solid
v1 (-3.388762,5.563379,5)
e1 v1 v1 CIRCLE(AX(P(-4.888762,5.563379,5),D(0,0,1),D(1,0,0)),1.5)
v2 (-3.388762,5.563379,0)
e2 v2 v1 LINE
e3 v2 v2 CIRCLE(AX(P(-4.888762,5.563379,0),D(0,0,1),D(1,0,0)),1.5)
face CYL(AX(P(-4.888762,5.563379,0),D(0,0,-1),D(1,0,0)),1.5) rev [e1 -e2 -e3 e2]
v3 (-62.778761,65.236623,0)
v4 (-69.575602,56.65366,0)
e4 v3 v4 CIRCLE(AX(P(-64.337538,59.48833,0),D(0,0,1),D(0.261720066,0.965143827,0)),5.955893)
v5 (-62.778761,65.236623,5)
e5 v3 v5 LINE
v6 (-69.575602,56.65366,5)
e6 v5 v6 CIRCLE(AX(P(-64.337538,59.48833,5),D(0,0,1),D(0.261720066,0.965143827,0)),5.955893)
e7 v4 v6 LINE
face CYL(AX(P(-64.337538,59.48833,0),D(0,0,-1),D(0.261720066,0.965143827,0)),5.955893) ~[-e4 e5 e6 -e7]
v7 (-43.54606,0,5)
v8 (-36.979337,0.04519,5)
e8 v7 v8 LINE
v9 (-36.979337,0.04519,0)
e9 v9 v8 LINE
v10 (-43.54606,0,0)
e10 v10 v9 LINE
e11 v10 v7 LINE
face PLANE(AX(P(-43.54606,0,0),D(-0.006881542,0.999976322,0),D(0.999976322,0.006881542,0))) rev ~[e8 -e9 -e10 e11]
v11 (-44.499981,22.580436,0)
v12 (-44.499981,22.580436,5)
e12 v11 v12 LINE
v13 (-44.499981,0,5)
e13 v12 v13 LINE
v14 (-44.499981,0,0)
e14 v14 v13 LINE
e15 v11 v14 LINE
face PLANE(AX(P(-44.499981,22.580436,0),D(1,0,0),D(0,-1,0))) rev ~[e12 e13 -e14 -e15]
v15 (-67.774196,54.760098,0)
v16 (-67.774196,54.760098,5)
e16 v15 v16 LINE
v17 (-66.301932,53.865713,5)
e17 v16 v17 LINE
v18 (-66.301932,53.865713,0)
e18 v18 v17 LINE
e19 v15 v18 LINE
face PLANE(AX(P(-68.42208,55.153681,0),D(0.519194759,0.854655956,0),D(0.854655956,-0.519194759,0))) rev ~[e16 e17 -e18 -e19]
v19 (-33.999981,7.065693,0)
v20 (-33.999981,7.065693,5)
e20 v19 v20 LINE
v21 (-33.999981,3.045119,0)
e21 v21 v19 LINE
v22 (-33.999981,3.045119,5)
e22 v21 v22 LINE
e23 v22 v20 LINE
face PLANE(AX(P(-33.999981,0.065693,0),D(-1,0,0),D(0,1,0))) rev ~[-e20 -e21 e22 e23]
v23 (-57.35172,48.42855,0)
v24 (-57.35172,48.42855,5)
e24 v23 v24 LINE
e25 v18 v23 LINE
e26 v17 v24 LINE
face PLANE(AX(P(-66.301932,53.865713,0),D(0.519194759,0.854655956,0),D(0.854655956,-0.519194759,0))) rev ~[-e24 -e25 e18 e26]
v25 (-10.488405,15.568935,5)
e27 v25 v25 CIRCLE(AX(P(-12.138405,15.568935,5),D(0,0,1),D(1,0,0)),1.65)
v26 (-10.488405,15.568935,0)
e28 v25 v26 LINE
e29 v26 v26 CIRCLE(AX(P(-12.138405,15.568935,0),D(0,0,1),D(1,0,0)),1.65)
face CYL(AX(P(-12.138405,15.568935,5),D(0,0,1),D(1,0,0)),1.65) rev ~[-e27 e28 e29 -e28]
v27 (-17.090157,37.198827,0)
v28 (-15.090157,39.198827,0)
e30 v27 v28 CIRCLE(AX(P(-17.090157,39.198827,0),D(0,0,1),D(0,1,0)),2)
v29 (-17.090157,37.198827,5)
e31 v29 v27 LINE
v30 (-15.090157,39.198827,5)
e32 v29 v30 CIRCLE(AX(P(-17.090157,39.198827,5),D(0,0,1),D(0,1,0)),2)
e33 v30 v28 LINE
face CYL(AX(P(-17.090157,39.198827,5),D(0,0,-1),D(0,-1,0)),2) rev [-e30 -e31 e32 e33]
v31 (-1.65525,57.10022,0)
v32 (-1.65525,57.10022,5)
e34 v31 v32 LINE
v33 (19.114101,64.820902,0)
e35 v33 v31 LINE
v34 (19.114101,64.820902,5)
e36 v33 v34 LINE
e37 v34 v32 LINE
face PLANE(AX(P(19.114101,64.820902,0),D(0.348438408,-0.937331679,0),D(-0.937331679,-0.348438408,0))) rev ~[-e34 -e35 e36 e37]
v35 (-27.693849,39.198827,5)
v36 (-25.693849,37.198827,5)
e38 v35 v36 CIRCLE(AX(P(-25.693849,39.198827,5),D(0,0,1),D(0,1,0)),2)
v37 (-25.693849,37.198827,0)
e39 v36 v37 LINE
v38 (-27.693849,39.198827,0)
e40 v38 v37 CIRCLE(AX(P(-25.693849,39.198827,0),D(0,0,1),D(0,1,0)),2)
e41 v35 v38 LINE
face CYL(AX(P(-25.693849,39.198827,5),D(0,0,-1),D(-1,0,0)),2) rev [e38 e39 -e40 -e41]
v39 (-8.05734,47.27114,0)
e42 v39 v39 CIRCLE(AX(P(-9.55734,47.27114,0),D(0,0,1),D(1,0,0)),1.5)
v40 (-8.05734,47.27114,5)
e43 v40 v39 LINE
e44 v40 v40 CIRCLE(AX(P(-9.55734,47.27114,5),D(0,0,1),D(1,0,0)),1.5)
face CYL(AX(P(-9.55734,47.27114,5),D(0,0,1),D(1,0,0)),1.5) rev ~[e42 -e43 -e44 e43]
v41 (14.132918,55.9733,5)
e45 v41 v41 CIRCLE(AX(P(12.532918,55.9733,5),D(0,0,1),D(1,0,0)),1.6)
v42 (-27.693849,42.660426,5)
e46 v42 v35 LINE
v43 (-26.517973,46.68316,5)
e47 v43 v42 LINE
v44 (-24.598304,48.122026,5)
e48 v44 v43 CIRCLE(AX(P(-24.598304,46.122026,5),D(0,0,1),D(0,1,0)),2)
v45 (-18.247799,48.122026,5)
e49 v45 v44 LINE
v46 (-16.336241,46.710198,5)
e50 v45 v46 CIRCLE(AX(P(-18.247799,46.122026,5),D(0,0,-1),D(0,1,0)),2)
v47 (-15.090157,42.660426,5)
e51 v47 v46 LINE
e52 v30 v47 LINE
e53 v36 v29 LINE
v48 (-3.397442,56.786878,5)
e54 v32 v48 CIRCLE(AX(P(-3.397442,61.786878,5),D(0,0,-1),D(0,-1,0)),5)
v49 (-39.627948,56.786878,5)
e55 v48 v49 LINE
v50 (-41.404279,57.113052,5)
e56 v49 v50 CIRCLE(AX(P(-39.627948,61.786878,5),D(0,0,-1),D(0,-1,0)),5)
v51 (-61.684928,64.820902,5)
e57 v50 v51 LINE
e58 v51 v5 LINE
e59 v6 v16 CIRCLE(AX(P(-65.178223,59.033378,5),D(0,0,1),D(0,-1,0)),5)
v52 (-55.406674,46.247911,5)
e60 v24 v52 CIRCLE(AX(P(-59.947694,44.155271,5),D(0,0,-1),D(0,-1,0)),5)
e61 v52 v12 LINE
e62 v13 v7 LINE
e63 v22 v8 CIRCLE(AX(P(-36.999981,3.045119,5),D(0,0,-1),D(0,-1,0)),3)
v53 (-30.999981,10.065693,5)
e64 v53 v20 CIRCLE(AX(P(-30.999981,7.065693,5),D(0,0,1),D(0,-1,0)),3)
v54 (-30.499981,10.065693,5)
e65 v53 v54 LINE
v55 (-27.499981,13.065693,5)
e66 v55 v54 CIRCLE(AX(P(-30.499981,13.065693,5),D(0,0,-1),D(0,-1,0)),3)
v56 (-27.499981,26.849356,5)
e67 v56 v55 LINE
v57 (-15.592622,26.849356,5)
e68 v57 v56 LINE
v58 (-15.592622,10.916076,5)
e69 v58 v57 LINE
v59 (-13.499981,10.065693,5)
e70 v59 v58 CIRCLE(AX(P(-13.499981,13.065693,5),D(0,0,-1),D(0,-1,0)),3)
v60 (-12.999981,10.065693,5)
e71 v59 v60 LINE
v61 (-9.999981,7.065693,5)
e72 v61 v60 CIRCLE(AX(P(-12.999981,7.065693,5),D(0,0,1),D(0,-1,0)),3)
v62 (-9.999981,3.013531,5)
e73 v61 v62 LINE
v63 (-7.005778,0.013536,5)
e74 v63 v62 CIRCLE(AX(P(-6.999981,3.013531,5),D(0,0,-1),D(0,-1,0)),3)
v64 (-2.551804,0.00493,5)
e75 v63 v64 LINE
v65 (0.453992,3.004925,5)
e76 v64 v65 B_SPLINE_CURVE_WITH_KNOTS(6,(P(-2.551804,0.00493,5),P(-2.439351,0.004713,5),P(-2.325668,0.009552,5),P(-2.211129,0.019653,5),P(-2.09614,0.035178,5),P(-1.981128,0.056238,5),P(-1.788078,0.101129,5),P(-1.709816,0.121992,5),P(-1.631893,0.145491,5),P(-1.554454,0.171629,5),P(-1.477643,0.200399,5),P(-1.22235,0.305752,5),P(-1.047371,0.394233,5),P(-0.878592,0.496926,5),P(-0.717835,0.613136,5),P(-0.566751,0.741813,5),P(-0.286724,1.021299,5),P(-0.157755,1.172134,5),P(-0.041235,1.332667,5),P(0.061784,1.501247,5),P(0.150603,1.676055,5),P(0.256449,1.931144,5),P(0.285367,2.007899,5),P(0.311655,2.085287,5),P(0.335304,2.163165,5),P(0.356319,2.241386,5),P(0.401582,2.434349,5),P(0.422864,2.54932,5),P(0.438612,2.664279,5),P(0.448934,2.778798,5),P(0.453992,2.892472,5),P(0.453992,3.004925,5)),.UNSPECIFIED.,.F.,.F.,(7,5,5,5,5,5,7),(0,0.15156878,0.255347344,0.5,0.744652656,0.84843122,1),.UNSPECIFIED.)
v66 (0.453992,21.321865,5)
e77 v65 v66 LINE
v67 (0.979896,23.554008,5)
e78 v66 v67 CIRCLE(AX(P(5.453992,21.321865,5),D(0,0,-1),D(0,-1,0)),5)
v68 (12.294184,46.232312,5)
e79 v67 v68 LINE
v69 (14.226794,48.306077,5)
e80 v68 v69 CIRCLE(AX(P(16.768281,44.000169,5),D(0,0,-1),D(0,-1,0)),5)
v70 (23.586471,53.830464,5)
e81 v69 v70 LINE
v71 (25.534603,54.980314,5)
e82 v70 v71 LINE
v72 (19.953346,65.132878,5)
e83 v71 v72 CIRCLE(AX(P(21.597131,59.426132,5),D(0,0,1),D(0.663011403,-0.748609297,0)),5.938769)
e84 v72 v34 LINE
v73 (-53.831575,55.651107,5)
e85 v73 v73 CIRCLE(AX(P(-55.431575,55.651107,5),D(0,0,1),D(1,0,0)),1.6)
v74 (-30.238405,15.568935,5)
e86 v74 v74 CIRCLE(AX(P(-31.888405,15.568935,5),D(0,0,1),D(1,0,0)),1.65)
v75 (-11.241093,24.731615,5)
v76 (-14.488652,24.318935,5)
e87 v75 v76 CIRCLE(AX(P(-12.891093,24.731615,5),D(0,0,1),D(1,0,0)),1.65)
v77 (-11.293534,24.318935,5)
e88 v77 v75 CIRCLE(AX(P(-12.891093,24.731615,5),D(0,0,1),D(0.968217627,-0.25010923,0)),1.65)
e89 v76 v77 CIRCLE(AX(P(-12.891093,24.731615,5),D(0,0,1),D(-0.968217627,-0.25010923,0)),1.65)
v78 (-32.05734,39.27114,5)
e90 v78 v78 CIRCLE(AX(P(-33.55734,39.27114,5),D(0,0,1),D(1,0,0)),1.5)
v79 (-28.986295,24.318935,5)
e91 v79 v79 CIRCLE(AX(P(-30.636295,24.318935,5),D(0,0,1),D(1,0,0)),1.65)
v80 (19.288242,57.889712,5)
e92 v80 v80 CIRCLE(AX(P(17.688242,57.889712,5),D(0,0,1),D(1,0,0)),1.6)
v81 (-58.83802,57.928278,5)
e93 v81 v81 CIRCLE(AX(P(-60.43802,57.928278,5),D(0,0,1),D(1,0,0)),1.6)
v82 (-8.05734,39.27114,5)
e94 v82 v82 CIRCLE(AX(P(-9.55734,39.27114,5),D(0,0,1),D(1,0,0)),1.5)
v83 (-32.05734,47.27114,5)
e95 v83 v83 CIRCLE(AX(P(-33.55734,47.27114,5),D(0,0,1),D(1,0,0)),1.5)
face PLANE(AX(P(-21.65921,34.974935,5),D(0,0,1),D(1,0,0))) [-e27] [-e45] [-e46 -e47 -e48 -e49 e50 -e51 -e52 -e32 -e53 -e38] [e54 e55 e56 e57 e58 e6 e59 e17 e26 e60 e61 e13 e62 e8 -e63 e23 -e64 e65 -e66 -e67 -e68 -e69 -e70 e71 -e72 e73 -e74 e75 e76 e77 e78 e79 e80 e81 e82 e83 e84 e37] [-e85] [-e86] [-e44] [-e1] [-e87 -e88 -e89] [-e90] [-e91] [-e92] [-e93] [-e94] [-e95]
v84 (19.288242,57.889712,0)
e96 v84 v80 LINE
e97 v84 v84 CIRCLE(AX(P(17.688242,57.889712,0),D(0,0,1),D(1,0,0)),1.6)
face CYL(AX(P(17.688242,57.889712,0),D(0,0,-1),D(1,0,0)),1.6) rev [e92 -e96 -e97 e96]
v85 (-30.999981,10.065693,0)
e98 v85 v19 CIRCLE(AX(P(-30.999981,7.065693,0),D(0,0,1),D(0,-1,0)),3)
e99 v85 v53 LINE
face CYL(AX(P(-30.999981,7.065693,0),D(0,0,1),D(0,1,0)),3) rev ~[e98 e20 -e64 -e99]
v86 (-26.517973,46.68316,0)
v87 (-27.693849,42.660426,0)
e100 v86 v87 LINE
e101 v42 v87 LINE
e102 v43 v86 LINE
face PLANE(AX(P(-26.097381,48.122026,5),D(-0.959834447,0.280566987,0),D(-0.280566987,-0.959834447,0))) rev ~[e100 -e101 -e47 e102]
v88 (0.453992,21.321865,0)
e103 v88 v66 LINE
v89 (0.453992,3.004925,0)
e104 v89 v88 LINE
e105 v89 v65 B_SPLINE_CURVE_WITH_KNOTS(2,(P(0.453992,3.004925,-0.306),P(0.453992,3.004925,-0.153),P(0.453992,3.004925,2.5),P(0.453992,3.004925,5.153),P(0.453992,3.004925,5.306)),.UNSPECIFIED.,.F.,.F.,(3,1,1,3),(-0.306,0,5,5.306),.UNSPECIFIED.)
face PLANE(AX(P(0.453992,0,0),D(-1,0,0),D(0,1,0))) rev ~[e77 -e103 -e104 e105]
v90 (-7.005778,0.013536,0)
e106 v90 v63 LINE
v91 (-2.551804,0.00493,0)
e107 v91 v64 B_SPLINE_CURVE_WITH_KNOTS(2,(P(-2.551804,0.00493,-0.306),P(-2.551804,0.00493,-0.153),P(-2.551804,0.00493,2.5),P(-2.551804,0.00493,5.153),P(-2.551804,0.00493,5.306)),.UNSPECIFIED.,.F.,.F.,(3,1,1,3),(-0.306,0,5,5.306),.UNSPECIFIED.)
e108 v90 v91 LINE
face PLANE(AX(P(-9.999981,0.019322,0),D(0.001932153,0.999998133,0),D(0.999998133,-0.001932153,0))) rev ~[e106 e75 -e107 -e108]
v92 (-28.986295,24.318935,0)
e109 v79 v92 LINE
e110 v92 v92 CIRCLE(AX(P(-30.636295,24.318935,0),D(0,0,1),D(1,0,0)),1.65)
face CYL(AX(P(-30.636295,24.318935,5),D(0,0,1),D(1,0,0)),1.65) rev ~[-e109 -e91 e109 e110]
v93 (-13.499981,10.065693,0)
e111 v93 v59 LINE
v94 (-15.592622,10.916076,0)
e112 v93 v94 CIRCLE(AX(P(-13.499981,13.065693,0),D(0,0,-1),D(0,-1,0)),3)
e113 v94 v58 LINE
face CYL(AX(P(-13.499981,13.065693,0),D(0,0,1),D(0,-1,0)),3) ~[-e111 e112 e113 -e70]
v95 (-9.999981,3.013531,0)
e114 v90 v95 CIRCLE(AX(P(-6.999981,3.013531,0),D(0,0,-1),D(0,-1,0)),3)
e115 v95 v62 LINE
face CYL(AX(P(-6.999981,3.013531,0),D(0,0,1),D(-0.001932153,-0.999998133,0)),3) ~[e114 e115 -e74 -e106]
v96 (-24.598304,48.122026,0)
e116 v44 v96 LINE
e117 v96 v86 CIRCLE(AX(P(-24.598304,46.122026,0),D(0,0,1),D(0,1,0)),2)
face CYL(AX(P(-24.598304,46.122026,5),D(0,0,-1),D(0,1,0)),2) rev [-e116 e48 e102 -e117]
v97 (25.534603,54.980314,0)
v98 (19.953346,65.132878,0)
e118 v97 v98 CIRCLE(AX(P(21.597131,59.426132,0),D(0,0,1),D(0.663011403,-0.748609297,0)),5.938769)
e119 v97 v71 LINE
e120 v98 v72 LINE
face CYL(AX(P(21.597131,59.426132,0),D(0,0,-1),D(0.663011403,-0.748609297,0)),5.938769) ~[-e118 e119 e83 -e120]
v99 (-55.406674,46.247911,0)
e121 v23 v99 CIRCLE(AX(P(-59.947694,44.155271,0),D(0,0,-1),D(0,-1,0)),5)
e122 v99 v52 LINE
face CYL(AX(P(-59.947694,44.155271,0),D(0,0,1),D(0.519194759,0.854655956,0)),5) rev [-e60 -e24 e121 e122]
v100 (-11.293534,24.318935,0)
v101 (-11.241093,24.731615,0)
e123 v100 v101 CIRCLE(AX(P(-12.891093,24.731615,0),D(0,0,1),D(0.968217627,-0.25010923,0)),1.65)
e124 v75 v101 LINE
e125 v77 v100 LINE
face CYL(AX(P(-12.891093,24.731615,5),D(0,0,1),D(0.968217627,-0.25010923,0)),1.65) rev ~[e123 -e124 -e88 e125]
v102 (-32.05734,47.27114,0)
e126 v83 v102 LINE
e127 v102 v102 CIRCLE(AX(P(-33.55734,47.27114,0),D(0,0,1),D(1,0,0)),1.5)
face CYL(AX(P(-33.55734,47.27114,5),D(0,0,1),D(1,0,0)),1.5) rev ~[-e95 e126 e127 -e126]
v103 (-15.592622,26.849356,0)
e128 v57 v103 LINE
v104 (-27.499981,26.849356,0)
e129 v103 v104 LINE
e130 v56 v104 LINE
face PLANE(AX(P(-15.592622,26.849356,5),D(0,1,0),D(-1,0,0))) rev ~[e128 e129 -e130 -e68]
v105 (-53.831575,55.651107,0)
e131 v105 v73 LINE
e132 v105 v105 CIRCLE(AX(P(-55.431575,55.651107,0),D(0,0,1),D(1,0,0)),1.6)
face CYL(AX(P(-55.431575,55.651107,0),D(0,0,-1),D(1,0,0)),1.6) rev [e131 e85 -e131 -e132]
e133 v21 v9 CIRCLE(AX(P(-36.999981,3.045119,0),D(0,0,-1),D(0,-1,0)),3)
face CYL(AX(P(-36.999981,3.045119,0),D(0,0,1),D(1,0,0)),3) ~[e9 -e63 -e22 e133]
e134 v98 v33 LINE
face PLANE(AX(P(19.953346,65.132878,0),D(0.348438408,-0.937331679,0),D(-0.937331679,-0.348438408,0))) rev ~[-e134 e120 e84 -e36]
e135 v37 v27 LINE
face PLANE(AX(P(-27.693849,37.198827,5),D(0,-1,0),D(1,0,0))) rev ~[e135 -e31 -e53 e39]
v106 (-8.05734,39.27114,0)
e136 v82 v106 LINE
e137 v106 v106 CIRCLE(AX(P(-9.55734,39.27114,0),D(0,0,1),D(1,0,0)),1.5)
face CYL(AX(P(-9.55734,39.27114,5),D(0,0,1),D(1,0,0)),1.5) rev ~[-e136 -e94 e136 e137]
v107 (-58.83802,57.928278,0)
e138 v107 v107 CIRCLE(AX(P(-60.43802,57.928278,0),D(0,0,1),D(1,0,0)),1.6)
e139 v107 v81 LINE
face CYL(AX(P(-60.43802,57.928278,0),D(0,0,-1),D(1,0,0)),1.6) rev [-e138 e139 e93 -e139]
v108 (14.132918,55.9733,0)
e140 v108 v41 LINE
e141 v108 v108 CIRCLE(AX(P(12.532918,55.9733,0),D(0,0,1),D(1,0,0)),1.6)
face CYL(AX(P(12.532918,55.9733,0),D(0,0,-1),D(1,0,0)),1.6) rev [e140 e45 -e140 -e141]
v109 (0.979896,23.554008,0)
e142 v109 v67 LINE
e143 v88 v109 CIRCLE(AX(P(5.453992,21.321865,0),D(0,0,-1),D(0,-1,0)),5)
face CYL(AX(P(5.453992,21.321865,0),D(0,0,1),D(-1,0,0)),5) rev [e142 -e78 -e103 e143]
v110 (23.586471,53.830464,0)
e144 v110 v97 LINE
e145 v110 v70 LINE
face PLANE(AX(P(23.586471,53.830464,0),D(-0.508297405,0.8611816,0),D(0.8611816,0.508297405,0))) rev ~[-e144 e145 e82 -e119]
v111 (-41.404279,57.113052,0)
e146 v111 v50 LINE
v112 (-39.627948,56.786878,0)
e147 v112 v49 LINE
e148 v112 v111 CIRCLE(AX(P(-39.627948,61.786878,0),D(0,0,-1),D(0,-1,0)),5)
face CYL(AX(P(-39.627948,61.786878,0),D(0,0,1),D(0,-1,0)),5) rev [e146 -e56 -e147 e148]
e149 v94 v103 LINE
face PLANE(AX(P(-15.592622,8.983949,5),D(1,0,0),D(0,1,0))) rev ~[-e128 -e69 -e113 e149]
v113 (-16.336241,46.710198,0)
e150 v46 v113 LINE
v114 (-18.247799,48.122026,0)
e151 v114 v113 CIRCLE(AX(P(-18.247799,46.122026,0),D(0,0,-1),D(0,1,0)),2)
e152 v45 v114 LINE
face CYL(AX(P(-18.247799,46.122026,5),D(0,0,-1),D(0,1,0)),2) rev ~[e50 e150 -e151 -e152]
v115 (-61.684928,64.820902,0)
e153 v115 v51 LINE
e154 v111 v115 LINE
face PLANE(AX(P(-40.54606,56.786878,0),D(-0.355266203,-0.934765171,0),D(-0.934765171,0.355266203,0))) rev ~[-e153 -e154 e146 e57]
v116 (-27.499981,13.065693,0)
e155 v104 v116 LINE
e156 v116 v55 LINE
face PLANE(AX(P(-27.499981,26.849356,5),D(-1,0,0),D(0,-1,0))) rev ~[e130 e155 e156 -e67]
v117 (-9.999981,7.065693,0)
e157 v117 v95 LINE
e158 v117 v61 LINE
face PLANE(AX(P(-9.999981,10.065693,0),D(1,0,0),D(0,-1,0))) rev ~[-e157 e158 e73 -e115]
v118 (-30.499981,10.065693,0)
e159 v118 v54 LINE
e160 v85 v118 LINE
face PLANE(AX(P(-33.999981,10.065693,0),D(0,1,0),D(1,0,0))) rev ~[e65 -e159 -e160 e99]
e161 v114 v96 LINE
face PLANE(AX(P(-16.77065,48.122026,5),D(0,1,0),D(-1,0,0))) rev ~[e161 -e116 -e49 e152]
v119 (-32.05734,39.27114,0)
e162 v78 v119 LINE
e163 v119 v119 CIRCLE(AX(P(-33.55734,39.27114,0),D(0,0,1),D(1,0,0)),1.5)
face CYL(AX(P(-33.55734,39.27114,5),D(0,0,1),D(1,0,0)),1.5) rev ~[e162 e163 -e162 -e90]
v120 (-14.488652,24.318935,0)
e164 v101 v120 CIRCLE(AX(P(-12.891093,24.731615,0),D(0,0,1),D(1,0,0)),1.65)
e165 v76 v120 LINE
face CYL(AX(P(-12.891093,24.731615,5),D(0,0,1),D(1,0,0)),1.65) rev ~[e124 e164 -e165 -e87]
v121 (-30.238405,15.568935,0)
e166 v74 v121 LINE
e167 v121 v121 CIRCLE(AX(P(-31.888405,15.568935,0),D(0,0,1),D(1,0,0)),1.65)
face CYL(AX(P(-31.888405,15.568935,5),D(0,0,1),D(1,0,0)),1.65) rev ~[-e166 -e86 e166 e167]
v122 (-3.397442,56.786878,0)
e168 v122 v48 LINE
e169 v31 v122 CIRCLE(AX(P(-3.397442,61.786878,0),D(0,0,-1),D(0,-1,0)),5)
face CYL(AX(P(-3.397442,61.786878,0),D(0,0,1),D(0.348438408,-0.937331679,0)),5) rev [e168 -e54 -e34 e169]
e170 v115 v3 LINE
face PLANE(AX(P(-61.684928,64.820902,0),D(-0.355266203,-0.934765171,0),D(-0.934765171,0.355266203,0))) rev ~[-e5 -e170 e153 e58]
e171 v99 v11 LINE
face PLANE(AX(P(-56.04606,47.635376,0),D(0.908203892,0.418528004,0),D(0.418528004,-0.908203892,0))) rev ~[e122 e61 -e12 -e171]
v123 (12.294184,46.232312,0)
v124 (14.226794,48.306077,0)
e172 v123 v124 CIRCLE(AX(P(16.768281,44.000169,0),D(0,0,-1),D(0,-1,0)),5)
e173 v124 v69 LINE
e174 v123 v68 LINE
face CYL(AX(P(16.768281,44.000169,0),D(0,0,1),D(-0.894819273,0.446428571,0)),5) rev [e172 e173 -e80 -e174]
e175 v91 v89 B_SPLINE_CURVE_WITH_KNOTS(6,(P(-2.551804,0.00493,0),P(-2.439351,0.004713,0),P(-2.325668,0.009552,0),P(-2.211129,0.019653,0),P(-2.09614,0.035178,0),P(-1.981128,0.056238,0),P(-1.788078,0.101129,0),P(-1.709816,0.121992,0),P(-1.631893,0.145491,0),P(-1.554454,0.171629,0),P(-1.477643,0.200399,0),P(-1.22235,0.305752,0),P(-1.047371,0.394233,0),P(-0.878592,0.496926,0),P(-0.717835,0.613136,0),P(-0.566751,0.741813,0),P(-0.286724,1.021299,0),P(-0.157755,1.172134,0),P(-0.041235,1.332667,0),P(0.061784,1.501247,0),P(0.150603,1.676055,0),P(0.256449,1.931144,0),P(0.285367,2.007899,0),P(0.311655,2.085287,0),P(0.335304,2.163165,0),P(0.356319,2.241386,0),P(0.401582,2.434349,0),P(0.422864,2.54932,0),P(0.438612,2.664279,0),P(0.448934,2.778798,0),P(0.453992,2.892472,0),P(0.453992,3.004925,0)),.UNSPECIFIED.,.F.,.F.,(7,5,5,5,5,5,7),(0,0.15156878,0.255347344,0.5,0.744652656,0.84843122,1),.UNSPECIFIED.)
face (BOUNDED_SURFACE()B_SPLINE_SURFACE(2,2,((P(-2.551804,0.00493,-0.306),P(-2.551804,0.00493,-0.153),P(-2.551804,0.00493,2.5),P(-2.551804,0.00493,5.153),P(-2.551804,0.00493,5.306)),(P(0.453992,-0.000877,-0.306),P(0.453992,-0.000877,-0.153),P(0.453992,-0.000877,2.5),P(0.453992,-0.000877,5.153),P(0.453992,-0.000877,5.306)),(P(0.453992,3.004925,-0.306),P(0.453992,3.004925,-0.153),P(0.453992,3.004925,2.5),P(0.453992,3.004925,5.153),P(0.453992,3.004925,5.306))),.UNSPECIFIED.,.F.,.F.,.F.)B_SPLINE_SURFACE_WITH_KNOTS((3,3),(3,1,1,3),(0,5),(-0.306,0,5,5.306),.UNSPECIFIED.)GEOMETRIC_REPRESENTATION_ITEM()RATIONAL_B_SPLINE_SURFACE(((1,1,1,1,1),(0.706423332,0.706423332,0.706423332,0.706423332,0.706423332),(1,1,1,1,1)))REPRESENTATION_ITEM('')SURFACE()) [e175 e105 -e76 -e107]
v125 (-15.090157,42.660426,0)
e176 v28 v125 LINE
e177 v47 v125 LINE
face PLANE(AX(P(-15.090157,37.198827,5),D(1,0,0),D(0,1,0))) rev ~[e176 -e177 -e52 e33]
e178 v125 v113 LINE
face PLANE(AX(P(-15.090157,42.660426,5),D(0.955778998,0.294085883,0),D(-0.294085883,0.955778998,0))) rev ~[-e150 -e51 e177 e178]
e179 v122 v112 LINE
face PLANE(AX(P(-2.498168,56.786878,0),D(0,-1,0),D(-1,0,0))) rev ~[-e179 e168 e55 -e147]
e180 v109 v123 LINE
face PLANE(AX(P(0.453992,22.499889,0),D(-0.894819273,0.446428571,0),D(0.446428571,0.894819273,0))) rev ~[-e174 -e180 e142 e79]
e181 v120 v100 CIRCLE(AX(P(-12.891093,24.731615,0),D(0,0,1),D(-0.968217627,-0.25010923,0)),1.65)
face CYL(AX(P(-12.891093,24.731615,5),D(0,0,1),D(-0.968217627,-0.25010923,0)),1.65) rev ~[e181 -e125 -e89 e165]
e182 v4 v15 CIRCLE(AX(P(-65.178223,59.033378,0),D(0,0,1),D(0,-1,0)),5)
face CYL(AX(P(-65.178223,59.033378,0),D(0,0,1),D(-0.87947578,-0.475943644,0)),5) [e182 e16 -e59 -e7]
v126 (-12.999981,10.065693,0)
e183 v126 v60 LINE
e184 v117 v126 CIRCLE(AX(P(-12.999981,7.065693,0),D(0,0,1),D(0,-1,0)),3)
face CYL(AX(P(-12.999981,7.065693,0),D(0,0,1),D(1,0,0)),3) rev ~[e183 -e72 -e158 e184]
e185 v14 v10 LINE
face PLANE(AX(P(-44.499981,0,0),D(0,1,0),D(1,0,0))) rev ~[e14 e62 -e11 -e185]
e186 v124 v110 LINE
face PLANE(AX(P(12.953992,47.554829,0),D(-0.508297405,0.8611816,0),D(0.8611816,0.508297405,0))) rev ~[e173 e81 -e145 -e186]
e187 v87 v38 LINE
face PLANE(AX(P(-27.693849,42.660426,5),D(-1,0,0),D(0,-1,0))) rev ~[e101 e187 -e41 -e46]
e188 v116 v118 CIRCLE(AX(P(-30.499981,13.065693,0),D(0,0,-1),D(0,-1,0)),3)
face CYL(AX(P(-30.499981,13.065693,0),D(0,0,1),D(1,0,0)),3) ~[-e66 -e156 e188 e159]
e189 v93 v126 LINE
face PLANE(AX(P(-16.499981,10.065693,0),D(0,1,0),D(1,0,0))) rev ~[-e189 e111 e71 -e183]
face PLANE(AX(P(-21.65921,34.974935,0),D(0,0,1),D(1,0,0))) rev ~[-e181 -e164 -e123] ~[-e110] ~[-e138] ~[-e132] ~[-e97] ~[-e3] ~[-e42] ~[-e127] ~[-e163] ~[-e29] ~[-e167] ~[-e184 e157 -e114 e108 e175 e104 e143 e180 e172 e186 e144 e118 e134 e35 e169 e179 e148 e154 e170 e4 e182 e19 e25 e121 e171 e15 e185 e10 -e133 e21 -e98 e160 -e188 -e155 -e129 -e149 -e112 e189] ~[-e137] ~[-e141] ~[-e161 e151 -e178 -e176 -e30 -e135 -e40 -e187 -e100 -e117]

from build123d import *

# Parameters (mm, degrees)
F0_R      = 1.5
F0_R_2    = 1.6
F1_DEPTH  = 5
F2_R      = 3
F3_R      = 2
F4_R      = 5
F5_R      = 5
F6_R      = 1.5
F7_DEPTH  = 25
F9_DEPTH  = 25
F10_R     = 2
F11_R     = 1.65
F12_DEPTH = 25
F14_DEPTH = 25


with BuildPart() as f1:
    # F0 (on Top) → F1 (new body)
    with BuildSketch(Plane.XY):
        with BuildLine():
            Line((-9.9999813339, 0.0193215341), (0, 0))
            Line((0, 0), (0.4539924878, 0))
            Line((0.4539924878, 0), (0.4539924878, 22.4998891728))
            Line((0.4539924878, 22.4998891728), (12.9539924878, 47.5548288056))
            Line((12.9539924878, 47.5548288056), (23.5864712774, 53.8304637924))
            Line((23.5864712774, 53.8304637924), (25.5346026442, 54.9803143218))
            ThreePointArc((25.5346026442, 54.9803143218), (26.8013490925, 62.2870919693), (19.9533457596, 65.1328777146))
            Line((19.9533457596, 65.1328777146), (19.1141014773, 64.8209017638))
            Line((19.1141014773, 64.8209017638), (-2.4981679914, 56.7868782273))
            Line((-2.4981679914, 56.7868782273), (-40.5460603337, 56.7868782273))
            Line((-40.5460603337, 56.7868782273), (-61.6849283551, 64.8209017638))
            Line((-61.6849283551, 64.8209017638), (-62.7787610133, 65.2366230461))
            ThreePointArc((-62.7787610133, 65.2366230461), (-69.534777582, 62.3971715251), (-68.4220804384, 55.1536813523))
            Line((-68.4220804384, 55.1536813523), (-66.3019318016, 53.8657127229))
            Line((-66.3019318016, 53.8657127229), (-56.0460603337, 47.6353756185))
            Line((-56.0460603337, 47.6353756185), (-44.4999813339, 22.5804359857))
            Line((-44.4999813339, 22.5804359857), (-44.4999813339, 0))
            Line((-44.4999813339, 0), (-43.5460603337, 0))
            Line((-43.5460603337, 0), (-33.9999813339, 0.0656933026))
            Line((-33.9999813339, 0.0656933026), (-33.9999813339, 10.0656933026))
            Line((-33.9999813339, 10.0656933026), (-27.4999813339, 10.0656933026))
            Line((-27.4999813339, 10.0656933026), (-27.4999813339, 22.5656933026))
            Line((-27.4999813339, 22.5656933026), (-27.4999813339, 26.3816152201))
            Line((-27.4999813339, 26.3816152201), (-16.4999813339, 26.3816152201))
            Line((-16.4999813339, 26.3816152201), (-16.4999813339, 10.0656933026))
            Line((-16.4999813339, 10.0656933026), (-9.9999813339, 10.0656933026))
            Line((-9.9999813339, 10.0656933026), (-9.9999813339, 0.0193215341))
        make_face()
        with Locations((-4.888762403, 5.563379294)):
            Circle(F0_R, mode=Mode.SUBTRACT)
        with Locations((-55.4315750417, 55.6511066578)):
            Circle(F0_R_2, mode=Mode.SUBTRACT)
        with Locations((-60.4380198654, 57.9282781987)):
            Circle(F0_R_2, mode=Mode.SUBTRACT)
        with Locations((12.5329179775, 55.9733003324)):
            Circle(F0_R_2, mode=Mode.SUBTRACT)
        with Locations((17.6882422101, 57.8897115767)):
            Circle(F0_R_2, mode=Mode.SUBTRACT)
    extrude(amount=F1_DEPTH)

    # F2
    f2_edges = [f1.edges().sort_by_distance(p)[0] for p in [
        (-27.499981, 10.065693, 2.5),
        (-33.999981, 10.065693, 2.5),
        (-16.499981, 10.065693, 2.5),
        (-9.999981, 10.065693, 2.5),
        (-9.999981, 0.019322, 2.5),
        (-33.999981, 0.065693, 2.5),
        (-43.54606, 0, 2.5),
        (0.453992, 0, 2.5),
    ]]
    fillet(f2_edges, radius=F2_R)

    # F3
    f3_edges = [f1.edges().sort_by_distance(p)[0] for p in [
        (-16.499981, 26.381615, 2.5),
    ]]
    fillet(f3_edges, radius=F3_R)

    # F4
    f4_edges = [f1.edges().sort_by_distance(p)[0] for p in [
        (-43.54606, 0, 2.5),
        (0.453992, 22.499889, 2.5),
    ]]
    fillet(f4_edges, radius=F4_R)

    # F5
    f5_edges = [f1.edges().sort_by_distance(p)[0] for p in [
        (12.953992, 47.554829, 2.5),
        (-2.498168, 56.786878, 2.5),
        (-40.54606, 56.786878, 2.5),
        (-68.42208, 55.153681, 2.5),
        (-56.04606, 47.635376, 2.5),
    ]]
    fillet(f5_edges, radius=F5_R)

    # F6 (on face) → F7 (cut)
    with BuildSketch(Plane.XY.offset(5)):
        with Locations((-33.5573396883, 47.271139662)):
            Circle(F6_R)
        with Locations((-33.5573396883, 39.271139662)):
            Circle(F6_R)
        with Locations((-9.5573396883, 39.271139662)):
            Circle(F6_R)
        with Locations((-9.5573396883, 47.271139662)):
            Circle(F6_R)
    extrude(amount=-F7_DEPTH, mode=Mode.SUBTRACT)

    # F8 (on face) → F9 (cut)
    with BuildSketch(Plane.XY.offset(5)):
        Polygon((-16.7706497014, 48.1220260262), (-26.0973814875, 48.1220260262), (-27.693849057, 42.6604263484), (-27.693849057, 37.1988266706), (-15.0901572779, 37.1988266706), (-15.0901572779, 42.6604263484), align=None)
    extrude(amount=-F9_DEPTH, mode=Mode.SUBTRACT)

    # F10
    f10_edges = [f1.edges().sort_by_distance(p)[0] for p in [
        (-26.097381, 48.122026, 2.5),
        (-16.77065, 48.122026, 2.5),
        (-27.693849, 37.198827, 2.5),
        (-15.090157, 37.198827, 2.5),
    ]]
    fillet(f10_edges, radius=F10_R)

    # F11 (on face) → F12 (cut)
    with BuildSketch(Plane.XY.offset(5)):
        with Locations((-31.8884050022, 15.5689349914)):
            Circle(F11_R)
        with Locations((-12.1384050022, 15.5689349914)):
            Circle(F11_R)
        with Locations((-30.6362952974, 24.3189349914)):
            Circle(F11_R)
        with BuildLine():
            ThreePointArc((-11.241093269, 24.7316152201), (-13.0990926805, 26.368452489), (-14.4886523536, 24.3189349914))
            Line((-14.4886523536, 24.3189349914), (-11.2935341844, 24.3189349914))
            ThreePointArc((-11.2935341844, 24.3189349914), (-11.2542560001, 24.5236158086), (-11.241093269, 24.7316152201))
        make_face()
        with BuildLine():
            Line((-11.2935341844, 24.3189349914), (-14.4886523536, 24.3189349914))
            ThreePointArc((-14.4886523536, 24.3189349914), (-12.891093269, 23.0816152201), (-11.2935341844, 24.3189349914))
        make_face()
    extrude(amount=-F12_DEPTH, mode=Mode.SUBTRACT)

    # F13 (on face) → F14 (cut)
    with BuildSketch(Plane.XY.offset(5)):
        Polygon((-27.4999813339, 26.8493555486), (-27.4999813339, 24.3816152201), (-15.5926216394, 8.9839491993), (-15.5926216394, 26.8493555486), (-16.1031354219, 26.8493555486), align=None)
    extrude(amount=-F14_DEPTH, mode=Mode.SUBTRACT)


solid = f1.part
